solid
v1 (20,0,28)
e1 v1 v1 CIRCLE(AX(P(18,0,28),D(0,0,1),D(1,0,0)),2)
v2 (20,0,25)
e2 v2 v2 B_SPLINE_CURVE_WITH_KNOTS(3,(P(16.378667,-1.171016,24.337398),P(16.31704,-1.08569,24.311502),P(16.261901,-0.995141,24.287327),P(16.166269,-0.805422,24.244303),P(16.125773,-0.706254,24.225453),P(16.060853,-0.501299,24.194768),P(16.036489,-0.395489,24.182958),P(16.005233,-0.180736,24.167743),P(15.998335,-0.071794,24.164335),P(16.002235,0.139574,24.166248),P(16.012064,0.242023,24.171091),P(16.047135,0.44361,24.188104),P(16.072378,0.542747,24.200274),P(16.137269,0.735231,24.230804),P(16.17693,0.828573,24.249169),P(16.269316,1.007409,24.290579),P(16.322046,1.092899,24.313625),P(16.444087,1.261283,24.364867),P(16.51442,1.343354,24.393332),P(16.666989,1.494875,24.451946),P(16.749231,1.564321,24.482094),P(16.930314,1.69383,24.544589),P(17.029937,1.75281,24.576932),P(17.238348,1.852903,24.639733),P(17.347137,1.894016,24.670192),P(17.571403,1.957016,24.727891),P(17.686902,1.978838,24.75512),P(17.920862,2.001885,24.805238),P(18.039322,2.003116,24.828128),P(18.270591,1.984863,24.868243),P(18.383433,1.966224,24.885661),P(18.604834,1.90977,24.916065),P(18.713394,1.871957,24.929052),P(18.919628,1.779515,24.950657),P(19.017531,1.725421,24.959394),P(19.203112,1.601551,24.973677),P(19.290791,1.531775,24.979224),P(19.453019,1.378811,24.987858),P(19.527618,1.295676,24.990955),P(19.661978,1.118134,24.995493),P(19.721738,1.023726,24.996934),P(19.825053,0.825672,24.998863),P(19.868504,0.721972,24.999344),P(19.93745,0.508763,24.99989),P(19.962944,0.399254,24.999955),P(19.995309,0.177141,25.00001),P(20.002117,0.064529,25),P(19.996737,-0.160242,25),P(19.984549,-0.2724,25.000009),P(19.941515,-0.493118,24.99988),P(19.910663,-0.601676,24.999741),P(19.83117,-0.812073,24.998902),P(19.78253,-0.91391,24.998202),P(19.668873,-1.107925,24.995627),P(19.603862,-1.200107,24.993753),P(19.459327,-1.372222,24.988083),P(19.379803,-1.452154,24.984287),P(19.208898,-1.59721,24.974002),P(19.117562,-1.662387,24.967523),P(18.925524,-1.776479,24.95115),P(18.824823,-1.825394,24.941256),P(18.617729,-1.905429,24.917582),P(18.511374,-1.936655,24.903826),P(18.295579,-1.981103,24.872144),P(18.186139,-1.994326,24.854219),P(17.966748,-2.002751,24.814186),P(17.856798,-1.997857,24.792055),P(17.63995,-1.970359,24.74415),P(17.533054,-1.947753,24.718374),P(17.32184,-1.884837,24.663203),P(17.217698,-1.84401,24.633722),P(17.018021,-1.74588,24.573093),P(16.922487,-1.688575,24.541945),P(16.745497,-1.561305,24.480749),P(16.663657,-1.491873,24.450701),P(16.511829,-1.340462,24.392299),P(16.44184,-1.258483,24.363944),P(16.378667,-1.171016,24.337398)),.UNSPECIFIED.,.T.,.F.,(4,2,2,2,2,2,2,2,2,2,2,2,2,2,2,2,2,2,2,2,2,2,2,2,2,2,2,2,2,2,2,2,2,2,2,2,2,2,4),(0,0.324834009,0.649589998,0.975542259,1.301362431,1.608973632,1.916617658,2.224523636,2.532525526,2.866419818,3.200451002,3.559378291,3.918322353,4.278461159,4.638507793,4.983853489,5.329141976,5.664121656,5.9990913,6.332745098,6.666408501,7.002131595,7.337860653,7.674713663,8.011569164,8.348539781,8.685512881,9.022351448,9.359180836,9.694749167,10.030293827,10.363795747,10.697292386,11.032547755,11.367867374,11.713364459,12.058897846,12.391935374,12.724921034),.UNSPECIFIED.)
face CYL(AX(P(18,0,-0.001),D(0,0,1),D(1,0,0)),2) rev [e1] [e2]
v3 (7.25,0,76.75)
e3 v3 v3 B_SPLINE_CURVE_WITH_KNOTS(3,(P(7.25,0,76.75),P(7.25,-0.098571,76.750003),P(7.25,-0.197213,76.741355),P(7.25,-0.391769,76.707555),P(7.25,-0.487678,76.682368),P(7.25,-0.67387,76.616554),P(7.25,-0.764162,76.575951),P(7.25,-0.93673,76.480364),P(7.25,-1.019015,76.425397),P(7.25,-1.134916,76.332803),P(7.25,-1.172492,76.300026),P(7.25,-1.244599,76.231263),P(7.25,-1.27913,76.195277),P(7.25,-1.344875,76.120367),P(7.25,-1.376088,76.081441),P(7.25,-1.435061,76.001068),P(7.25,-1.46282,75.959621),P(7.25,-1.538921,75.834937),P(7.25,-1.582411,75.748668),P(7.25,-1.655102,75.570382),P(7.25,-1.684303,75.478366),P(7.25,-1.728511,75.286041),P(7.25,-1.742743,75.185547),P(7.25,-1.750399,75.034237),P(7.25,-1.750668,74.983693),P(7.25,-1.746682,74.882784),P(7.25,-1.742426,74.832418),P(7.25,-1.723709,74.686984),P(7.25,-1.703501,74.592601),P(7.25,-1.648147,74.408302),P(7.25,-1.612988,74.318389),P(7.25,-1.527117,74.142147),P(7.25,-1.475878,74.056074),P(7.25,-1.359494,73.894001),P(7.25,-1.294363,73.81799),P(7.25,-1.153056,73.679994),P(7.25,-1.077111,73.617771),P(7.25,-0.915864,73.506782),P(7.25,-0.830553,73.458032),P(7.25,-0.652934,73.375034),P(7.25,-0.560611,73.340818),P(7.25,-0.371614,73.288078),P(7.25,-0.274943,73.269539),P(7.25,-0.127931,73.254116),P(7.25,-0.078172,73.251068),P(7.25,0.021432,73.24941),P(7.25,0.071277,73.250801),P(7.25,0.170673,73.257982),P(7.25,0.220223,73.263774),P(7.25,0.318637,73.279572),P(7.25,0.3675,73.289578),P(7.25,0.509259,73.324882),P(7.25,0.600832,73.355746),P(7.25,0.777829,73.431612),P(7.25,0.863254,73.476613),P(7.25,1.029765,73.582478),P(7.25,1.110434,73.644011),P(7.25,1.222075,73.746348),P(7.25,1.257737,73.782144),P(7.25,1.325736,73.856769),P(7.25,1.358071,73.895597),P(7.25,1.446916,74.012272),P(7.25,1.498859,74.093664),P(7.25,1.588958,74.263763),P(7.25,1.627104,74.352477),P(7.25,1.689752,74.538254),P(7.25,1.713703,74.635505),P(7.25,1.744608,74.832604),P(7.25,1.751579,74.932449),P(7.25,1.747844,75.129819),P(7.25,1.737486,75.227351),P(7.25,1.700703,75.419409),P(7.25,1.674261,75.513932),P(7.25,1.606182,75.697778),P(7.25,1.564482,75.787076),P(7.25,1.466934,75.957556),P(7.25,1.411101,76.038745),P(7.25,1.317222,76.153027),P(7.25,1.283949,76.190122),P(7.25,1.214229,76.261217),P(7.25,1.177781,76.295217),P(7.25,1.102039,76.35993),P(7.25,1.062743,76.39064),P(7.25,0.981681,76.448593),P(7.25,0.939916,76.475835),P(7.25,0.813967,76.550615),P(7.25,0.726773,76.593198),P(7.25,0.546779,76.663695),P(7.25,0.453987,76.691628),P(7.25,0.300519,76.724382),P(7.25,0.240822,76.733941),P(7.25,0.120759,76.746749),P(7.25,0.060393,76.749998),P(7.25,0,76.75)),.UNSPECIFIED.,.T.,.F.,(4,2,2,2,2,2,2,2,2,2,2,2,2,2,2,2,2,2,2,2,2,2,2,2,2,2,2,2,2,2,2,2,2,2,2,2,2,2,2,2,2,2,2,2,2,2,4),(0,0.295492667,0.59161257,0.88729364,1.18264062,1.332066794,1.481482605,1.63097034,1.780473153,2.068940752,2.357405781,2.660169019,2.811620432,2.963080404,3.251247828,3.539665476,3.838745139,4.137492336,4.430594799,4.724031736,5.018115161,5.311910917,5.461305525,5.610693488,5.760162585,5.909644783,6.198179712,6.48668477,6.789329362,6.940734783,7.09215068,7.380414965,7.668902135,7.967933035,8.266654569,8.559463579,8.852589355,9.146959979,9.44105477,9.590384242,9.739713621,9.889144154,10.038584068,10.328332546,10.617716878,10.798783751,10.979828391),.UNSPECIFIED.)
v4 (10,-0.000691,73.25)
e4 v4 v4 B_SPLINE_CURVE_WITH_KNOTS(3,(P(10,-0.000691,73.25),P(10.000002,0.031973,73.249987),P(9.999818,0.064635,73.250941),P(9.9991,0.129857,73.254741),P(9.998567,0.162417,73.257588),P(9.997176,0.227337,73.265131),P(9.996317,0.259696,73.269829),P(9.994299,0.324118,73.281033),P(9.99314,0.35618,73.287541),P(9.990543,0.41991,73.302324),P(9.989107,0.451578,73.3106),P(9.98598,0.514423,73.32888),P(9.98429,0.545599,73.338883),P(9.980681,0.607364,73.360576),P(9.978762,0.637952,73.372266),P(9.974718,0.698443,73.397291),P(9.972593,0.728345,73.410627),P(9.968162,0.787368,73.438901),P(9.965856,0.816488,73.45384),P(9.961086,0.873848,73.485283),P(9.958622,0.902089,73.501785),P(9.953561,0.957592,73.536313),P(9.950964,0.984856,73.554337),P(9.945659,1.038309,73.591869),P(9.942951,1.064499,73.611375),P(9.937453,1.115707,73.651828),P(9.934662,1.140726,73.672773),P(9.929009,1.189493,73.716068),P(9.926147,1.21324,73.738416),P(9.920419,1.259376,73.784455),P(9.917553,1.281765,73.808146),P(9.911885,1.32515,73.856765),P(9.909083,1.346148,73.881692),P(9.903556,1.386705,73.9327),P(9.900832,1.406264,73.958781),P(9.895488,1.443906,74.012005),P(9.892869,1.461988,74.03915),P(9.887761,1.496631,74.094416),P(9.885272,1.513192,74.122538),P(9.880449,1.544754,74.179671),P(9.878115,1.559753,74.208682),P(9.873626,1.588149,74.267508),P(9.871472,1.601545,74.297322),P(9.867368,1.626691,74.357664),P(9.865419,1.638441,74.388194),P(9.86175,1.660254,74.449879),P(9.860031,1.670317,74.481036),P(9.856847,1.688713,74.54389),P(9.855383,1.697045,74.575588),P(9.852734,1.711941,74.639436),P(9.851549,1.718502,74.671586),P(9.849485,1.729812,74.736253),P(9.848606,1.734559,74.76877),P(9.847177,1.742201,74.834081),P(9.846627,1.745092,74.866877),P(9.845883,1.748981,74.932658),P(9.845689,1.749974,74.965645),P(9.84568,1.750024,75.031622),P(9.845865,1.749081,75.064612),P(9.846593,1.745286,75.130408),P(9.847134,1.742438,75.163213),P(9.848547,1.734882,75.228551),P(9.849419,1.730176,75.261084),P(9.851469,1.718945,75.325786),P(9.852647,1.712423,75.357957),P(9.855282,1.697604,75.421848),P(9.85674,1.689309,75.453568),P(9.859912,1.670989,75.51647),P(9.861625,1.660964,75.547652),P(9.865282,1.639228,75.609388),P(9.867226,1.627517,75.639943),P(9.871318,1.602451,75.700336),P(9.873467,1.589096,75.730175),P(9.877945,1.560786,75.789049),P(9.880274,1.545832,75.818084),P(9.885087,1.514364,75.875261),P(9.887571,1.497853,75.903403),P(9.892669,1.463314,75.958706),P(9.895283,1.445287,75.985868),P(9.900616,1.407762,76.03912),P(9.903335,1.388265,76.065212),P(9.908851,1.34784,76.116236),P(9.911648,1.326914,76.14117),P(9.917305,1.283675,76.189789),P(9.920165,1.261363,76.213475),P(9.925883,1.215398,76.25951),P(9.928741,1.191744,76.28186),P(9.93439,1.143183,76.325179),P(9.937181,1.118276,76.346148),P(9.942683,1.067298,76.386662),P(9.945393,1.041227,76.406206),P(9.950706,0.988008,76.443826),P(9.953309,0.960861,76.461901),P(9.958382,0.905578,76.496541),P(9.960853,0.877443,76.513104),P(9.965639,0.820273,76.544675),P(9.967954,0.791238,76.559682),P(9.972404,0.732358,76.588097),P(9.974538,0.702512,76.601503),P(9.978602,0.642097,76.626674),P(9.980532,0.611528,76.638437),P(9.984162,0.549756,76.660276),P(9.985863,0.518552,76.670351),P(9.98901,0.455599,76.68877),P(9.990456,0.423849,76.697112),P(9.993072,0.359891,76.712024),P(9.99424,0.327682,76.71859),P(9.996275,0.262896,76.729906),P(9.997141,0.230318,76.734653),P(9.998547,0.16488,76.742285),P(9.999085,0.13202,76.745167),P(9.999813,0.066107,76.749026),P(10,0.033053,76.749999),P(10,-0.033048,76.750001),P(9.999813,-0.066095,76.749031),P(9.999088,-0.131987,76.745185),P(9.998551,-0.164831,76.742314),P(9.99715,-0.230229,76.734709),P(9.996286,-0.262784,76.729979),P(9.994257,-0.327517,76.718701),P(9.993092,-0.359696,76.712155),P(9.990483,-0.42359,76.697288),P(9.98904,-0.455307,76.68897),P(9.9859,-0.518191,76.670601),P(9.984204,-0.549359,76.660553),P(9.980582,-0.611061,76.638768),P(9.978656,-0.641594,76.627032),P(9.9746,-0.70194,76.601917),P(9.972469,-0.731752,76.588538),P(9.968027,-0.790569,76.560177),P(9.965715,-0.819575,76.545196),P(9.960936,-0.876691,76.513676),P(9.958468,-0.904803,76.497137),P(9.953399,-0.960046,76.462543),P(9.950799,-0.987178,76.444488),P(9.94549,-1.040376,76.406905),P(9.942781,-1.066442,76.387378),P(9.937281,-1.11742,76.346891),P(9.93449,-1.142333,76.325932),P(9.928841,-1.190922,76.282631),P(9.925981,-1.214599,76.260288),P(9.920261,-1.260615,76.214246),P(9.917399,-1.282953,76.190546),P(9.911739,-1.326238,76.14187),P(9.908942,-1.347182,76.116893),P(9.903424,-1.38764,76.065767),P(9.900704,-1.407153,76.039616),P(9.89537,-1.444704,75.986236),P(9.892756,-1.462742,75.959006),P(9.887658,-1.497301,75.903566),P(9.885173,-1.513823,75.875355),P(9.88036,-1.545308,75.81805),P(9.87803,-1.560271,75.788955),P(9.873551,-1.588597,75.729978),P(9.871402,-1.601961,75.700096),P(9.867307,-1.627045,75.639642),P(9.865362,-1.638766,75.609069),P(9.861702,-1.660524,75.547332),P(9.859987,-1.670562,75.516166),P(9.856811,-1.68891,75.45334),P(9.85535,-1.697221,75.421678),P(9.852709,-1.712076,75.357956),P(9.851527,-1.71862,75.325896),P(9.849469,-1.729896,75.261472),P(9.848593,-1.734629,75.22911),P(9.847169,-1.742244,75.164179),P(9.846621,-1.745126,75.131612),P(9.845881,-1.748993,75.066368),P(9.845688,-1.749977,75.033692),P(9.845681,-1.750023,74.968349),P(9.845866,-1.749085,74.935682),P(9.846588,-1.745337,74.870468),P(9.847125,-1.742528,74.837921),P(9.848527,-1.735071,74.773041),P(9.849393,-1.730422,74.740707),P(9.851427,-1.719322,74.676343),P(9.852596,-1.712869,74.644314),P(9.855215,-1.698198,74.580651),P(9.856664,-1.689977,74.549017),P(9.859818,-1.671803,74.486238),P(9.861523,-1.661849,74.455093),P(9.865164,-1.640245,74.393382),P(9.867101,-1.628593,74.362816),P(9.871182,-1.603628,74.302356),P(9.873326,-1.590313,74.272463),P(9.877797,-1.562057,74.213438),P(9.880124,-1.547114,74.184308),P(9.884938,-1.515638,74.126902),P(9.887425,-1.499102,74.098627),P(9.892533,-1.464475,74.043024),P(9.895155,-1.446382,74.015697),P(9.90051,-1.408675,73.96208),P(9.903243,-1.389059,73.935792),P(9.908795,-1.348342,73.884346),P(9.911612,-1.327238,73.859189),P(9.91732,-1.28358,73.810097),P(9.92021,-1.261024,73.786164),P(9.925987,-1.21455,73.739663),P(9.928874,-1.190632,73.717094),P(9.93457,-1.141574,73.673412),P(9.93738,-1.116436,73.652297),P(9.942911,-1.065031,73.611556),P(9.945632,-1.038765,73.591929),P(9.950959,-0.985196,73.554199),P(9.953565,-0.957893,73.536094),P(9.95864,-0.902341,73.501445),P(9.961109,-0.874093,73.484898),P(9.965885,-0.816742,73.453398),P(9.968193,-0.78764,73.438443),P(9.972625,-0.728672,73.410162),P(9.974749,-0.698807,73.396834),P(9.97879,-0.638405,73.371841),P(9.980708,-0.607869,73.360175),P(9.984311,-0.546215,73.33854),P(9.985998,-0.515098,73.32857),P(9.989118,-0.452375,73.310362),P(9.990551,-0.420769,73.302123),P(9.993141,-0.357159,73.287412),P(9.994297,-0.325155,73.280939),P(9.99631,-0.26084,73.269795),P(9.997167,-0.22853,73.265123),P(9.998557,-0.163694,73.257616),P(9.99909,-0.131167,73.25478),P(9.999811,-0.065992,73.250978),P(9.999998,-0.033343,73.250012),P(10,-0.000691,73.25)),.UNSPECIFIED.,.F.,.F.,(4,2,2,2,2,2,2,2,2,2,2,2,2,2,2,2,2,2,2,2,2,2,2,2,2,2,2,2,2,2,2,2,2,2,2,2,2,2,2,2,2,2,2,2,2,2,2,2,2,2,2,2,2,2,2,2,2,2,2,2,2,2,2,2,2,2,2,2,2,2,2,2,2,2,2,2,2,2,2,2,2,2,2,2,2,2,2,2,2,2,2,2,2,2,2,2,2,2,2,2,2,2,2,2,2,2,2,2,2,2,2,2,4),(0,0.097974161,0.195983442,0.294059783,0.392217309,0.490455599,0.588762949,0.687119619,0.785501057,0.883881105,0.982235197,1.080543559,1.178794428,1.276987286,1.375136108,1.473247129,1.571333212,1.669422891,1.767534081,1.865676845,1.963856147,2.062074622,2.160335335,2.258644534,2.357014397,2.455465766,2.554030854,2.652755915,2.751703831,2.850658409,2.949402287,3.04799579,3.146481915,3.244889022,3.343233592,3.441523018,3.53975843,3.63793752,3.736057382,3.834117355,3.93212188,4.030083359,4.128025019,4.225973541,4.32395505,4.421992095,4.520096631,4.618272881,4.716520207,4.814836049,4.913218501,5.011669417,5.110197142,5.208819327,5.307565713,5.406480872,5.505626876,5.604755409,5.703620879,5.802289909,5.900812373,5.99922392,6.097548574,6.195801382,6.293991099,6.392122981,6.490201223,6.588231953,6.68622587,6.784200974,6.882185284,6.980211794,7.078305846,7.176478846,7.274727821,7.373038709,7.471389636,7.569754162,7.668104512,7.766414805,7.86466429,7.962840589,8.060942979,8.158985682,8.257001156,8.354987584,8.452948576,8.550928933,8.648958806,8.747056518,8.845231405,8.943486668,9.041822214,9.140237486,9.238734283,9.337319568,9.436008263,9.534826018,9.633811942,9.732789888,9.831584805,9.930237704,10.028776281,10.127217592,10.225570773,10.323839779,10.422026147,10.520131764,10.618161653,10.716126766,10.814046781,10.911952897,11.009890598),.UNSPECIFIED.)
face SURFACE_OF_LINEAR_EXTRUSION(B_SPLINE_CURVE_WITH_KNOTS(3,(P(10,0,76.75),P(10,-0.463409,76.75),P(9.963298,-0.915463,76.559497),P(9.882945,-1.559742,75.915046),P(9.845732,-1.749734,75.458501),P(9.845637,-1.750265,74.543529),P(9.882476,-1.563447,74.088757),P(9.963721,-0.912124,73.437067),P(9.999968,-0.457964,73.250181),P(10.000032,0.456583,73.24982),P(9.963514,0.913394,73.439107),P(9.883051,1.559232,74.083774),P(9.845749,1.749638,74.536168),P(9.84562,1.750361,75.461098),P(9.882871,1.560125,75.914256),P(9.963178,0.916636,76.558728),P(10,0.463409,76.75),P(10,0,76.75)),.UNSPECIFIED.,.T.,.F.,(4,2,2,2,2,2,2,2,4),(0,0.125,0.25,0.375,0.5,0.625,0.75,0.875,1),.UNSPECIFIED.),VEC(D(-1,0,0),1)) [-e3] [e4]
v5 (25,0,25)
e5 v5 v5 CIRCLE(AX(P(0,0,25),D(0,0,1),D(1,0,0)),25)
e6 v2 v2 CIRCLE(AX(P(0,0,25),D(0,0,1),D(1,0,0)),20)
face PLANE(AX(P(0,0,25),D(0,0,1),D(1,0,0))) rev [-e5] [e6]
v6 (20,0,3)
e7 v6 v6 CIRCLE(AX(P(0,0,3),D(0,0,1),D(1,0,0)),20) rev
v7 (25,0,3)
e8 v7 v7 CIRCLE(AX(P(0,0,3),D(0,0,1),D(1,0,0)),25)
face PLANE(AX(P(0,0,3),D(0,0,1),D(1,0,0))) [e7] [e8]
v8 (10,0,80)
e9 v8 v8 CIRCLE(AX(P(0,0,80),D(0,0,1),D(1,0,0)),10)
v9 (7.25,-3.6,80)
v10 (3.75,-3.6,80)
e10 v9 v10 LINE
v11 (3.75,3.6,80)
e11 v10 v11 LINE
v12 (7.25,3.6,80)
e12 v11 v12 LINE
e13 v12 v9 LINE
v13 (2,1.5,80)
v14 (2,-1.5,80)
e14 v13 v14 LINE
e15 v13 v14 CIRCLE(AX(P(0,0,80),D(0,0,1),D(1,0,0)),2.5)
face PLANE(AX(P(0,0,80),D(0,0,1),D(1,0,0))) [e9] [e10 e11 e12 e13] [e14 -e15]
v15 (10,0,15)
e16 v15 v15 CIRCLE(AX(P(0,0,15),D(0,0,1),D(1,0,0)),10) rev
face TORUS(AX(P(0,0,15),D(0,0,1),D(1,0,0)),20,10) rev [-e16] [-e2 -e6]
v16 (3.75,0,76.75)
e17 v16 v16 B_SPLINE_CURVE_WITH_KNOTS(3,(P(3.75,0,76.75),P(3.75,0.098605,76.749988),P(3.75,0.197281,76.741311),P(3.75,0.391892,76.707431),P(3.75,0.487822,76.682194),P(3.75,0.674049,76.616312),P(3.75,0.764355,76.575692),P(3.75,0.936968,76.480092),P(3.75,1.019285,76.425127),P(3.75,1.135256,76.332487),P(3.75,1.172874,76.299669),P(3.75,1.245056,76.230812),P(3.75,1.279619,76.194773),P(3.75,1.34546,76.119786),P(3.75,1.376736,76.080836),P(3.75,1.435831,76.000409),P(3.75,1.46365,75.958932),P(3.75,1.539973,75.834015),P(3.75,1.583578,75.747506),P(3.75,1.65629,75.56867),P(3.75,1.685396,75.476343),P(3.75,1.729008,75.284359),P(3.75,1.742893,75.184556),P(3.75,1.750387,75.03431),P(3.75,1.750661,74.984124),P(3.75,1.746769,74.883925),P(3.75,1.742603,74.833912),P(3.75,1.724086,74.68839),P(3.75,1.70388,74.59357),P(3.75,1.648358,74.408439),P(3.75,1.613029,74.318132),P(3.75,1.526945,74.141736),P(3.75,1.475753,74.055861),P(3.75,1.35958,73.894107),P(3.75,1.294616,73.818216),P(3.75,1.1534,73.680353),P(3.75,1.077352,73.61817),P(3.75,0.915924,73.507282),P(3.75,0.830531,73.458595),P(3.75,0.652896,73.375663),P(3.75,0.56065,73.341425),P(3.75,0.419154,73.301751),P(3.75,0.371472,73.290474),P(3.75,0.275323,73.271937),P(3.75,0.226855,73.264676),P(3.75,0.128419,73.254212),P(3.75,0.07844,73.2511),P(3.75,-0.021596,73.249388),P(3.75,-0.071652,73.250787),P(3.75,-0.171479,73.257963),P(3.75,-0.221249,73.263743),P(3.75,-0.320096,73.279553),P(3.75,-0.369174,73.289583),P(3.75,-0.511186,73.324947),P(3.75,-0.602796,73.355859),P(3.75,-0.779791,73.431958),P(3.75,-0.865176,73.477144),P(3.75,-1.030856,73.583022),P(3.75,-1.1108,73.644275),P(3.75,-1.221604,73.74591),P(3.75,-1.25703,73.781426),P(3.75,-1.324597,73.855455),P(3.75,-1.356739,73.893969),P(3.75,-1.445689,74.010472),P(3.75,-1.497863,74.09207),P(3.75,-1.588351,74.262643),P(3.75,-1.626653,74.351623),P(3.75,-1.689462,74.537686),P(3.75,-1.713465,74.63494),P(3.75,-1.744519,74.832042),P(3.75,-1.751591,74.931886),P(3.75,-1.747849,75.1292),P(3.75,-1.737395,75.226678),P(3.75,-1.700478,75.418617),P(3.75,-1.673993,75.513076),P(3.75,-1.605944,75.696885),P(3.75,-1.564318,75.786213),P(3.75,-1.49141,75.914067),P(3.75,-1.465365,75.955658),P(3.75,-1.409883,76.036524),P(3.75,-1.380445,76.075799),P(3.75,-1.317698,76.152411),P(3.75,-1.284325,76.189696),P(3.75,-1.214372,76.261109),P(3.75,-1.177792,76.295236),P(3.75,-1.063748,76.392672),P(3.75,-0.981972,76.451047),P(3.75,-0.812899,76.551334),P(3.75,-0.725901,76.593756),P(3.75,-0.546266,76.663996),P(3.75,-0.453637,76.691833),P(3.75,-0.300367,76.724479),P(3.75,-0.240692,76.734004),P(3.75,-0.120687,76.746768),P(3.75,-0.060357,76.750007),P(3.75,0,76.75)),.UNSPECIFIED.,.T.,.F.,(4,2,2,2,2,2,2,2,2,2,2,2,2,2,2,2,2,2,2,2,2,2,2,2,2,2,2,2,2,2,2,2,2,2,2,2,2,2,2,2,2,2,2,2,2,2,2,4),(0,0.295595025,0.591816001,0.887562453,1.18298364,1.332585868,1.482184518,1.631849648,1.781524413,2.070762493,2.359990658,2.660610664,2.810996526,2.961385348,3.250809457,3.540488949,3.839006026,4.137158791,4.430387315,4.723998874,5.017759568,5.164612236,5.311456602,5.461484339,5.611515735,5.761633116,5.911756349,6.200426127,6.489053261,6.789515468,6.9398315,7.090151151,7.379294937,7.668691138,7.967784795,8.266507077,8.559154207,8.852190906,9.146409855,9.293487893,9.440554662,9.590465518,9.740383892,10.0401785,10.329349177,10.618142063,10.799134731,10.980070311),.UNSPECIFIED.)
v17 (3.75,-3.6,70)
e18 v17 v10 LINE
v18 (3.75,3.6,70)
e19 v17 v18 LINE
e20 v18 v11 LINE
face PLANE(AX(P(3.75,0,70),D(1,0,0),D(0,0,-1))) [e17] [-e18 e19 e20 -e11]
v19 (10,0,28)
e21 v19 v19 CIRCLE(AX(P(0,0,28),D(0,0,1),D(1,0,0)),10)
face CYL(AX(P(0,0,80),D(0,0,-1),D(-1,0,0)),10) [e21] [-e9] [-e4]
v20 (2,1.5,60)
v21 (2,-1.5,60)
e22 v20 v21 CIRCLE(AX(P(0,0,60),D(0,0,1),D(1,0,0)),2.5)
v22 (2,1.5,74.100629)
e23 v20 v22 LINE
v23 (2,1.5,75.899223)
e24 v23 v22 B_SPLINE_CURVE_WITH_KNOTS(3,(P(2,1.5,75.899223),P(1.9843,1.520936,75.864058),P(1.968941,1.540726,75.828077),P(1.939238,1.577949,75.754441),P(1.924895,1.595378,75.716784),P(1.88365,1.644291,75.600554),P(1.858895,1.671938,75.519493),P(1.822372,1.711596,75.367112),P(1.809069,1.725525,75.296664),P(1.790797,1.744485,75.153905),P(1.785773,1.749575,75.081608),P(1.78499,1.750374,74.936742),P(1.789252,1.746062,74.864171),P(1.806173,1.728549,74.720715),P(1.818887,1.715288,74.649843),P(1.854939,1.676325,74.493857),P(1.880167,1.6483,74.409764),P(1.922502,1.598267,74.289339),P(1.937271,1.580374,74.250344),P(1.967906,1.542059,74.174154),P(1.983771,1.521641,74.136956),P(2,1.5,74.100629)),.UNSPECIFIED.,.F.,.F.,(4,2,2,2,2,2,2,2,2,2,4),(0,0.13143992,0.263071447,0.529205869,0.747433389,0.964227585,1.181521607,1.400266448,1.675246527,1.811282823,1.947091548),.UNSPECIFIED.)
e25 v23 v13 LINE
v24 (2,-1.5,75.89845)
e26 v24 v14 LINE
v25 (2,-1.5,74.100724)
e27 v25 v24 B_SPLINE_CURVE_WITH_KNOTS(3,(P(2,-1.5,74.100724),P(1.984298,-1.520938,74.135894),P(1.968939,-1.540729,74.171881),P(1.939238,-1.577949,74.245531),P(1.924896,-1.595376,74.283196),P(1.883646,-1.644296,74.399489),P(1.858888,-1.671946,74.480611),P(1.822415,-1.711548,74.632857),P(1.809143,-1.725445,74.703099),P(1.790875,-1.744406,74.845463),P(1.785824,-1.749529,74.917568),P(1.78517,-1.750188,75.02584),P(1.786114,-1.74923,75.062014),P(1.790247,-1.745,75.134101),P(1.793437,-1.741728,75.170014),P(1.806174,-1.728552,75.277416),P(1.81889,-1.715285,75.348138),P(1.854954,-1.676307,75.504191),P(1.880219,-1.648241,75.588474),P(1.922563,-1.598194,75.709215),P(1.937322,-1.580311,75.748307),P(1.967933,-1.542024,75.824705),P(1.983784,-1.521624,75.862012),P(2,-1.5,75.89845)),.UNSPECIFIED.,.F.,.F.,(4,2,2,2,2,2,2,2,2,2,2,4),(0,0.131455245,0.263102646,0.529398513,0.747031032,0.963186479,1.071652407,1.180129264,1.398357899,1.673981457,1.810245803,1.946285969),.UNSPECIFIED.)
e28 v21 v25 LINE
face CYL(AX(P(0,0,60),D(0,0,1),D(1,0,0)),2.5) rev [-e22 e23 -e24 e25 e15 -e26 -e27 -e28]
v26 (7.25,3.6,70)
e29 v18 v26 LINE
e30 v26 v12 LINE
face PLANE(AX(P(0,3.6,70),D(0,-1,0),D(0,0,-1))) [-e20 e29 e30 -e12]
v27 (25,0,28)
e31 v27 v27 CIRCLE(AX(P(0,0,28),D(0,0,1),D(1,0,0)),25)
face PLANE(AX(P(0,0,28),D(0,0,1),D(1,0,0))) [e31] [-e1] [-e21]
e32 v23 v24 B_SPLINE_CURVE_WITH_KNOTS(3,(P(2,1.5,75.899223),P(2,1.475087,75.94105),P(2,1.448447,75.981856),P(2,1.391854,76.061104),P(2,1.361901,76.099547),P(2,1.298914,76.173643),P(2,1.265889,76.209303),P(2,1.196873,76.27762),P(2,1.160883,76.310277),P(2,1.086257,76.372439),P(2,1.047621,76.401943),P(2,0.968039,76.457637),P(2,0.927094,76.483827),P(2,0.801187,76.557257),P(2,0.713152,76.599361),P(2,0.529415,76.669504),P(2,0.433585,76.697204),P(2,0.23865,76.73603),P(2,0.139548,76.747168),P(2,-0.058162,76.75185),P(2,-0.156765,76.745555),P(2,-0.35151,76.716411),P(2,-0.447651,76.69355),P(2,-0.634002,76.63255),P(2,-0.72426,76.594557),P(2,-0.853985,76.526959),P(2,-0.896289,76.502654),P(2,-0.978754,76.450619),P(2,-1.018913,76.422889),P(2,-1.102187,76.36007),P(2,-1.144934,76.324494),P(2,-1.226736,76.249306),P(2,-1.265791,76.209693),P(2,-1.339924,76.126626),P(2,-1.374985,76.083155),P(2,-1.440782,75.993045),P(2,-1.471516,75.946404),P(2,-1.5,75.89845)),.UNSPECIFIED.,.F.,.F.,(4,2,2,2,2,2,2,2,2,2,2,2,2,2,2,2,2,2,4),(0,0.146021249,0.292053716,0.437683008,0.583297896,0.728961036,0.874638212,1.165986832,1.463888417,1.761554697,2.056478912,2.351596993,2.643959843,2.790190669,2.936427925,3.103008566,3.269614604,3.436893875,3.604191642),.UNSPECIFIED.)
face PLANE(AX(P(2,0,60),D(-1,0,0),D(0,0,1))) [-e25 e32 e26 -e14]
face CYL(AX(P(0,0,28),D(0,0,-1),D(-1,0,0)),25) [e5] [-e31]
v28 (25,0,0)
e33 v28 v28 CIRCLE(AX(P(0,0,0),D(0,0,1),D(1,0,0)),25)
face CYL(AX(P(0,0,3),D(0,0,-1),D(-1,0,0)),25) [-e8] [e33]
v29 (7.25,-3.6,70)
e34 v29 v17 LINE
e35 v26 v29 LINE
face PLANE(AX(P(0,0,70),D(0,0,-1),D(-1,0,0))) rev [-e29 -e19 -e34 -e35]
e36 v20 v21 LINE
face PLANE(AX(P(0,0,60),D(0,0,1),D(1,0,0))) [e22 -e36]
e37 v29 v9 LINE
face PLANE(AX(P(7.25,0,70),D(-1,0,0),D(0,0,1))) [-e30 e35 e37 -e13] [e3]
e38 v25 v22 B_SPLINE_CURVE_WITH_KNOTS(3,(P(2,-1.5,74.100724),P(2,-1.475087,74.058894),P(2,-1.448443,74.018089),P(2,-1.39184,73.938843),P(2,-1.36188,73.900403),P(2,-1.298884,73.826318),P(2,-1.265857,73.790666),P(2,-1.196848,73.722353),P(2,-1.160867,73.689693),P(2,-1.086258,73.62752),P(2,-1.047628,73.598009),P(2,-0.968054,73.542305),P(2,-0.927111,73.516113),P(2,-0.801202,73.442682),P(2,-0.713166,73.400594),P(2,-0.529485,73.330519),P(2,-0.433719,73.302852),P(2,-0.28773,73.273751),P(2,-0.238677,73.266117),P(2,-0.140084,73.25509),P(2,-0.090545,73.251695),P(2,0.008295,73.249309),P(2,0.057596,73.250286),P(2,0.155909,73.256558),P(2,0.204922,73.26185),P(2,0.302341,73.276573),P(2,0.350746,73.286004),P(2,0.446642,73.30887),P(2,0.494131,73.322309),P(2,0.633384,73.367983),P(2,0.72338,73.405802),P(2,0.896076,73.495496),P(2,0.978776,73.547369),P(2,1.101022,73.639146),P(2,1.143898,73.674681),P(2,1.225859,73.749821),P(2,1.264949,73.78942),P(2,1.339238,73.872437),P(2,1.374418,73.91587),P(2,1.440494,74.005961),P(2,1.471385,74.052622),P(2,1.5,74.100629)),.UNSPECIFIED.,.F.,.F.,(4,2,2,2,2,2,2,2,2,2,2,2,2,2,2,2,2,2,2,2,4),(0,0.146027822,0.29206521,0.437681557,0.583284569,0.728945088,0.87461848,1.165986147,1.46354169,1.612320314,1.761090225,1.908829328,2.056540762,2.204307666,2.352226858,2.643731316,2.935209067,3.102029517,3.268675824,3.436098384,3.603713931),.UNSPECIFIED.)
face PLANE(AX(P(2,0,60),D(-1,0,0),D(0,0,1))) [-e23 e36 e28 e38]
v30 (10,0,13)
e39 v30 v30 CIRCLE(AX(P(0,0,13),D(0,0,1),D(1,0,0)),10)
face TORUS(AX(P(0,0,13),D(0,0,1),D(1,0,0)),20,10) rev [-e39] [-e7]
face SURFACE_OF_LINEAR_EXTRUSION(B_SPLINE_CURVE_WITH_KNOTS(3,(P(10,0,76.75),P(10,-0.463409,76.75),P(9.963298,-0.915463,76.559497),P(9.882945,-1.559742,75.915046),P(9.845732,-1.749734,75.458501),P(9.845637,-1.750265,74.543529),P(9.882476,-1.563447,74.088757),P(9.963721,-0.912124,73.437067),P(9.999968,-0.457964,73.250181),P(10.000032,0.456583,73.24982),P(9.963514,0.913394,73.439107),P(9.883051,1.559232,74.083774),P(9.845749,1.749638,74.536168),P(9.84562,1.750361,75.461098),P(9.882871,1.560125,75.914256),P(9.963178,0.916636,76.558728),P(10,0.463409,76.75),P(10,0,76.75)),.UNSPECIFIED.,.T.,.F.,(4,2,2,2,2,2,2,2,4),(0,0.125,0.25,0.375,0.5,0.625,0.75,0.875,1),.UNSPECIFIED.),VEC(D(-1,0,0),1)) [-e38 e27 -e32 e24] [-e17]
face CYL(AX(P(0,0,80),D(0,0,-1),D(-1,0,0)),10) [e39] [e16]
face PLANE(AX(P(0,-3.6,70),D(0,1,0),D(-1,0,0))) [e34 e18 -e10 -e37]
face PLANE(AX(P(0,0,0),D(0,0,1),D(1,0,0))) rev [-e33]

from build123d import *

# Parameters (mm, degrees)
CROQUIS1_R              = 10
SALIENTE_EXTRUIR2_DEPTH = 80
CROQUIS4_R              = 25
SALIENTE_EXTRUIR3_DEPTH = 3
SALIENTE_EXTRUIR4_START = 25
CROQUIS5_R              = 25
SALIENTE_EXTRUIR4_DEPTH = 3
REDONDEO2_R             = 10
CORTAR_EXTRUIR1_START   = 80
CORTAR_EXTRUIR1_DEPTH   = 20
CORTAR_EXTRUIR2_START   = 80
CROQUIS7_W              = 3.5
CROQUIS7_H              = 7.2
CORTAR_EXTRUIR2_DEPTH   = 10
CORTAR_EXTRUIR3_START   = 1.785357468
CORTAR_EXTRUIR3_DEPTH   = 8.214642632
CORTAR_EXTRUIR4_START   = 24.165153
CROQUIS9_R              = 2
CORTAR_EXTRUIR4_DEPTH   = 3.834847


# Read off the part's stored shape, not the designer's step: Cortar-Extruir3
with BuildPart() as part:
    # Croquis1 → Saliente-Extruir2 (new body)
    with BuildSketch(Plane.XY):
        Circle(CROQUIS1_R)
    extrude(amount=SALIENTE_EXTRUIR2_DEPTH)

    # Croquis4 → Saliente-Extruir3 (add)
    with BuildSketch(Plane.XY):
        Circle(CROQUIS4_R)
    extrude(amount=SALIENTE_EXTRUIR3_DEPTH)

    # Croquis5 → Saliente-Extruir4 (add)
    with BuildSketch(Plane.XY.offset(SALIENTE_EXTRUIR4_START)):
        Circle(CROQUIS5_R)
    extrude(amount=SALIENTE_EXTRUIR4_DEPTH)

    # Redondeo2
    redondeo2_edges = [part.edges().sort_by_distance(p)[0] for p in [
        (-10, 0, 25),
        (-10, 0, 3),
    ]]
    fillet(redondeo2_edges, radius=REDONDEO2_R)

    # Croquis6 → Cortar-Extruir1 (cut)
    with BuildSketch(Plane.XY.offset(CORTAR_EXTRUIR1_START)):
        with BuildLine():
            Line((2, 1.5), (2, -1.5))
            ThreePointArc((2, -1.5), (-2.5, 0), (2, 1.5))
        make_face()
    extrude(amount=-CORTAR_EXTRUIR1_DEPTH, mode=Mode.SUBTRACT)

    # Croquis7 → Cortar-Extruir2 (cut)
    with BuildSketch(Plane.XY.offset(CORTAR_EXTRUIR2_START)):
        with Locations((5.5, 0)):
            Rectangle(CROQUIS7_W, CROQUIS7_H)
    extrude(amount=-CORTAR_EXTRUIR2_DEPTH, mode=Mode.SUBTRACT)

    # Cortar-Extruir3 outline → Cortar-Extruir3 (cut)
    with BuildSketch(Plane(origin=(0, 0, 0), x_dir=(0, 0, -1), z_dir=(1, 0, 0)).offset(CORTAR_EXTRUIR3_START)):
        with BuildLine():
            add(Edge.make_bspline(
                [(-73.250000008, 0), (-73.250010298, 0.457042806), (-73.439269311, 0.913556657), (-73.761440573, 1.236313288), (-74.083774062, 1.559232356), (-74.536167707, 1.749638189), (-74.998632957, 1.749999466), (-75.46109828, 1.75036072), (-75.914256207, 1.560125437), (-76.558728463, 0.916635921), (-76.75, 0.463408547), (-76.75, -0.463408547), (-76.559497121, -0.915462775), (-75.915045576, -1.559741953), (-75.458501248, -1.749734355), (-74.543528816, -1.750265056), (-74.088756627, -1.563446648), (-73.437067231, -0.912124478), (-73.250180582, -0.457964068), (-73.250000045, -0.000460382), (-73.250000003, -0.000230191), (-73.250000008, 0)],
                knots=[0.500062925, 0.500062925, 0.500062925, 0.500062925, 0.625, 0.625, 0.625000034, 0.750000005, 0.750000005, 0.750000019, 0.875000002, 0.875000002, 0.999999997, 0.999999997, 1.124999993, 1.124999993, 1.24999999, 1.24999999, 1.374999987, 1.374999987, 1.499999981, 1.499999981, 1.500062906, 1.500062906, 1.500062906, 1.500062906], degree=3))
        make_face()
    extrude(amount=CORTAR_EXTRUIR3_DEPTH, mode=Mode.SUBTRACT)

    # Croquis9 → Cortar-Extruir4 (cut)
    with BuildSketch(Plane.XY.offset(CORTAR_EXTRUIR4_START)):
        with Locations((18, 0)):
            Circle(CROQUIS9_R)
    extrude(amount=CORTAR_EXTRUIR4_DEPTH, mode=Mode.SUBTRACT)


solid = part.part
